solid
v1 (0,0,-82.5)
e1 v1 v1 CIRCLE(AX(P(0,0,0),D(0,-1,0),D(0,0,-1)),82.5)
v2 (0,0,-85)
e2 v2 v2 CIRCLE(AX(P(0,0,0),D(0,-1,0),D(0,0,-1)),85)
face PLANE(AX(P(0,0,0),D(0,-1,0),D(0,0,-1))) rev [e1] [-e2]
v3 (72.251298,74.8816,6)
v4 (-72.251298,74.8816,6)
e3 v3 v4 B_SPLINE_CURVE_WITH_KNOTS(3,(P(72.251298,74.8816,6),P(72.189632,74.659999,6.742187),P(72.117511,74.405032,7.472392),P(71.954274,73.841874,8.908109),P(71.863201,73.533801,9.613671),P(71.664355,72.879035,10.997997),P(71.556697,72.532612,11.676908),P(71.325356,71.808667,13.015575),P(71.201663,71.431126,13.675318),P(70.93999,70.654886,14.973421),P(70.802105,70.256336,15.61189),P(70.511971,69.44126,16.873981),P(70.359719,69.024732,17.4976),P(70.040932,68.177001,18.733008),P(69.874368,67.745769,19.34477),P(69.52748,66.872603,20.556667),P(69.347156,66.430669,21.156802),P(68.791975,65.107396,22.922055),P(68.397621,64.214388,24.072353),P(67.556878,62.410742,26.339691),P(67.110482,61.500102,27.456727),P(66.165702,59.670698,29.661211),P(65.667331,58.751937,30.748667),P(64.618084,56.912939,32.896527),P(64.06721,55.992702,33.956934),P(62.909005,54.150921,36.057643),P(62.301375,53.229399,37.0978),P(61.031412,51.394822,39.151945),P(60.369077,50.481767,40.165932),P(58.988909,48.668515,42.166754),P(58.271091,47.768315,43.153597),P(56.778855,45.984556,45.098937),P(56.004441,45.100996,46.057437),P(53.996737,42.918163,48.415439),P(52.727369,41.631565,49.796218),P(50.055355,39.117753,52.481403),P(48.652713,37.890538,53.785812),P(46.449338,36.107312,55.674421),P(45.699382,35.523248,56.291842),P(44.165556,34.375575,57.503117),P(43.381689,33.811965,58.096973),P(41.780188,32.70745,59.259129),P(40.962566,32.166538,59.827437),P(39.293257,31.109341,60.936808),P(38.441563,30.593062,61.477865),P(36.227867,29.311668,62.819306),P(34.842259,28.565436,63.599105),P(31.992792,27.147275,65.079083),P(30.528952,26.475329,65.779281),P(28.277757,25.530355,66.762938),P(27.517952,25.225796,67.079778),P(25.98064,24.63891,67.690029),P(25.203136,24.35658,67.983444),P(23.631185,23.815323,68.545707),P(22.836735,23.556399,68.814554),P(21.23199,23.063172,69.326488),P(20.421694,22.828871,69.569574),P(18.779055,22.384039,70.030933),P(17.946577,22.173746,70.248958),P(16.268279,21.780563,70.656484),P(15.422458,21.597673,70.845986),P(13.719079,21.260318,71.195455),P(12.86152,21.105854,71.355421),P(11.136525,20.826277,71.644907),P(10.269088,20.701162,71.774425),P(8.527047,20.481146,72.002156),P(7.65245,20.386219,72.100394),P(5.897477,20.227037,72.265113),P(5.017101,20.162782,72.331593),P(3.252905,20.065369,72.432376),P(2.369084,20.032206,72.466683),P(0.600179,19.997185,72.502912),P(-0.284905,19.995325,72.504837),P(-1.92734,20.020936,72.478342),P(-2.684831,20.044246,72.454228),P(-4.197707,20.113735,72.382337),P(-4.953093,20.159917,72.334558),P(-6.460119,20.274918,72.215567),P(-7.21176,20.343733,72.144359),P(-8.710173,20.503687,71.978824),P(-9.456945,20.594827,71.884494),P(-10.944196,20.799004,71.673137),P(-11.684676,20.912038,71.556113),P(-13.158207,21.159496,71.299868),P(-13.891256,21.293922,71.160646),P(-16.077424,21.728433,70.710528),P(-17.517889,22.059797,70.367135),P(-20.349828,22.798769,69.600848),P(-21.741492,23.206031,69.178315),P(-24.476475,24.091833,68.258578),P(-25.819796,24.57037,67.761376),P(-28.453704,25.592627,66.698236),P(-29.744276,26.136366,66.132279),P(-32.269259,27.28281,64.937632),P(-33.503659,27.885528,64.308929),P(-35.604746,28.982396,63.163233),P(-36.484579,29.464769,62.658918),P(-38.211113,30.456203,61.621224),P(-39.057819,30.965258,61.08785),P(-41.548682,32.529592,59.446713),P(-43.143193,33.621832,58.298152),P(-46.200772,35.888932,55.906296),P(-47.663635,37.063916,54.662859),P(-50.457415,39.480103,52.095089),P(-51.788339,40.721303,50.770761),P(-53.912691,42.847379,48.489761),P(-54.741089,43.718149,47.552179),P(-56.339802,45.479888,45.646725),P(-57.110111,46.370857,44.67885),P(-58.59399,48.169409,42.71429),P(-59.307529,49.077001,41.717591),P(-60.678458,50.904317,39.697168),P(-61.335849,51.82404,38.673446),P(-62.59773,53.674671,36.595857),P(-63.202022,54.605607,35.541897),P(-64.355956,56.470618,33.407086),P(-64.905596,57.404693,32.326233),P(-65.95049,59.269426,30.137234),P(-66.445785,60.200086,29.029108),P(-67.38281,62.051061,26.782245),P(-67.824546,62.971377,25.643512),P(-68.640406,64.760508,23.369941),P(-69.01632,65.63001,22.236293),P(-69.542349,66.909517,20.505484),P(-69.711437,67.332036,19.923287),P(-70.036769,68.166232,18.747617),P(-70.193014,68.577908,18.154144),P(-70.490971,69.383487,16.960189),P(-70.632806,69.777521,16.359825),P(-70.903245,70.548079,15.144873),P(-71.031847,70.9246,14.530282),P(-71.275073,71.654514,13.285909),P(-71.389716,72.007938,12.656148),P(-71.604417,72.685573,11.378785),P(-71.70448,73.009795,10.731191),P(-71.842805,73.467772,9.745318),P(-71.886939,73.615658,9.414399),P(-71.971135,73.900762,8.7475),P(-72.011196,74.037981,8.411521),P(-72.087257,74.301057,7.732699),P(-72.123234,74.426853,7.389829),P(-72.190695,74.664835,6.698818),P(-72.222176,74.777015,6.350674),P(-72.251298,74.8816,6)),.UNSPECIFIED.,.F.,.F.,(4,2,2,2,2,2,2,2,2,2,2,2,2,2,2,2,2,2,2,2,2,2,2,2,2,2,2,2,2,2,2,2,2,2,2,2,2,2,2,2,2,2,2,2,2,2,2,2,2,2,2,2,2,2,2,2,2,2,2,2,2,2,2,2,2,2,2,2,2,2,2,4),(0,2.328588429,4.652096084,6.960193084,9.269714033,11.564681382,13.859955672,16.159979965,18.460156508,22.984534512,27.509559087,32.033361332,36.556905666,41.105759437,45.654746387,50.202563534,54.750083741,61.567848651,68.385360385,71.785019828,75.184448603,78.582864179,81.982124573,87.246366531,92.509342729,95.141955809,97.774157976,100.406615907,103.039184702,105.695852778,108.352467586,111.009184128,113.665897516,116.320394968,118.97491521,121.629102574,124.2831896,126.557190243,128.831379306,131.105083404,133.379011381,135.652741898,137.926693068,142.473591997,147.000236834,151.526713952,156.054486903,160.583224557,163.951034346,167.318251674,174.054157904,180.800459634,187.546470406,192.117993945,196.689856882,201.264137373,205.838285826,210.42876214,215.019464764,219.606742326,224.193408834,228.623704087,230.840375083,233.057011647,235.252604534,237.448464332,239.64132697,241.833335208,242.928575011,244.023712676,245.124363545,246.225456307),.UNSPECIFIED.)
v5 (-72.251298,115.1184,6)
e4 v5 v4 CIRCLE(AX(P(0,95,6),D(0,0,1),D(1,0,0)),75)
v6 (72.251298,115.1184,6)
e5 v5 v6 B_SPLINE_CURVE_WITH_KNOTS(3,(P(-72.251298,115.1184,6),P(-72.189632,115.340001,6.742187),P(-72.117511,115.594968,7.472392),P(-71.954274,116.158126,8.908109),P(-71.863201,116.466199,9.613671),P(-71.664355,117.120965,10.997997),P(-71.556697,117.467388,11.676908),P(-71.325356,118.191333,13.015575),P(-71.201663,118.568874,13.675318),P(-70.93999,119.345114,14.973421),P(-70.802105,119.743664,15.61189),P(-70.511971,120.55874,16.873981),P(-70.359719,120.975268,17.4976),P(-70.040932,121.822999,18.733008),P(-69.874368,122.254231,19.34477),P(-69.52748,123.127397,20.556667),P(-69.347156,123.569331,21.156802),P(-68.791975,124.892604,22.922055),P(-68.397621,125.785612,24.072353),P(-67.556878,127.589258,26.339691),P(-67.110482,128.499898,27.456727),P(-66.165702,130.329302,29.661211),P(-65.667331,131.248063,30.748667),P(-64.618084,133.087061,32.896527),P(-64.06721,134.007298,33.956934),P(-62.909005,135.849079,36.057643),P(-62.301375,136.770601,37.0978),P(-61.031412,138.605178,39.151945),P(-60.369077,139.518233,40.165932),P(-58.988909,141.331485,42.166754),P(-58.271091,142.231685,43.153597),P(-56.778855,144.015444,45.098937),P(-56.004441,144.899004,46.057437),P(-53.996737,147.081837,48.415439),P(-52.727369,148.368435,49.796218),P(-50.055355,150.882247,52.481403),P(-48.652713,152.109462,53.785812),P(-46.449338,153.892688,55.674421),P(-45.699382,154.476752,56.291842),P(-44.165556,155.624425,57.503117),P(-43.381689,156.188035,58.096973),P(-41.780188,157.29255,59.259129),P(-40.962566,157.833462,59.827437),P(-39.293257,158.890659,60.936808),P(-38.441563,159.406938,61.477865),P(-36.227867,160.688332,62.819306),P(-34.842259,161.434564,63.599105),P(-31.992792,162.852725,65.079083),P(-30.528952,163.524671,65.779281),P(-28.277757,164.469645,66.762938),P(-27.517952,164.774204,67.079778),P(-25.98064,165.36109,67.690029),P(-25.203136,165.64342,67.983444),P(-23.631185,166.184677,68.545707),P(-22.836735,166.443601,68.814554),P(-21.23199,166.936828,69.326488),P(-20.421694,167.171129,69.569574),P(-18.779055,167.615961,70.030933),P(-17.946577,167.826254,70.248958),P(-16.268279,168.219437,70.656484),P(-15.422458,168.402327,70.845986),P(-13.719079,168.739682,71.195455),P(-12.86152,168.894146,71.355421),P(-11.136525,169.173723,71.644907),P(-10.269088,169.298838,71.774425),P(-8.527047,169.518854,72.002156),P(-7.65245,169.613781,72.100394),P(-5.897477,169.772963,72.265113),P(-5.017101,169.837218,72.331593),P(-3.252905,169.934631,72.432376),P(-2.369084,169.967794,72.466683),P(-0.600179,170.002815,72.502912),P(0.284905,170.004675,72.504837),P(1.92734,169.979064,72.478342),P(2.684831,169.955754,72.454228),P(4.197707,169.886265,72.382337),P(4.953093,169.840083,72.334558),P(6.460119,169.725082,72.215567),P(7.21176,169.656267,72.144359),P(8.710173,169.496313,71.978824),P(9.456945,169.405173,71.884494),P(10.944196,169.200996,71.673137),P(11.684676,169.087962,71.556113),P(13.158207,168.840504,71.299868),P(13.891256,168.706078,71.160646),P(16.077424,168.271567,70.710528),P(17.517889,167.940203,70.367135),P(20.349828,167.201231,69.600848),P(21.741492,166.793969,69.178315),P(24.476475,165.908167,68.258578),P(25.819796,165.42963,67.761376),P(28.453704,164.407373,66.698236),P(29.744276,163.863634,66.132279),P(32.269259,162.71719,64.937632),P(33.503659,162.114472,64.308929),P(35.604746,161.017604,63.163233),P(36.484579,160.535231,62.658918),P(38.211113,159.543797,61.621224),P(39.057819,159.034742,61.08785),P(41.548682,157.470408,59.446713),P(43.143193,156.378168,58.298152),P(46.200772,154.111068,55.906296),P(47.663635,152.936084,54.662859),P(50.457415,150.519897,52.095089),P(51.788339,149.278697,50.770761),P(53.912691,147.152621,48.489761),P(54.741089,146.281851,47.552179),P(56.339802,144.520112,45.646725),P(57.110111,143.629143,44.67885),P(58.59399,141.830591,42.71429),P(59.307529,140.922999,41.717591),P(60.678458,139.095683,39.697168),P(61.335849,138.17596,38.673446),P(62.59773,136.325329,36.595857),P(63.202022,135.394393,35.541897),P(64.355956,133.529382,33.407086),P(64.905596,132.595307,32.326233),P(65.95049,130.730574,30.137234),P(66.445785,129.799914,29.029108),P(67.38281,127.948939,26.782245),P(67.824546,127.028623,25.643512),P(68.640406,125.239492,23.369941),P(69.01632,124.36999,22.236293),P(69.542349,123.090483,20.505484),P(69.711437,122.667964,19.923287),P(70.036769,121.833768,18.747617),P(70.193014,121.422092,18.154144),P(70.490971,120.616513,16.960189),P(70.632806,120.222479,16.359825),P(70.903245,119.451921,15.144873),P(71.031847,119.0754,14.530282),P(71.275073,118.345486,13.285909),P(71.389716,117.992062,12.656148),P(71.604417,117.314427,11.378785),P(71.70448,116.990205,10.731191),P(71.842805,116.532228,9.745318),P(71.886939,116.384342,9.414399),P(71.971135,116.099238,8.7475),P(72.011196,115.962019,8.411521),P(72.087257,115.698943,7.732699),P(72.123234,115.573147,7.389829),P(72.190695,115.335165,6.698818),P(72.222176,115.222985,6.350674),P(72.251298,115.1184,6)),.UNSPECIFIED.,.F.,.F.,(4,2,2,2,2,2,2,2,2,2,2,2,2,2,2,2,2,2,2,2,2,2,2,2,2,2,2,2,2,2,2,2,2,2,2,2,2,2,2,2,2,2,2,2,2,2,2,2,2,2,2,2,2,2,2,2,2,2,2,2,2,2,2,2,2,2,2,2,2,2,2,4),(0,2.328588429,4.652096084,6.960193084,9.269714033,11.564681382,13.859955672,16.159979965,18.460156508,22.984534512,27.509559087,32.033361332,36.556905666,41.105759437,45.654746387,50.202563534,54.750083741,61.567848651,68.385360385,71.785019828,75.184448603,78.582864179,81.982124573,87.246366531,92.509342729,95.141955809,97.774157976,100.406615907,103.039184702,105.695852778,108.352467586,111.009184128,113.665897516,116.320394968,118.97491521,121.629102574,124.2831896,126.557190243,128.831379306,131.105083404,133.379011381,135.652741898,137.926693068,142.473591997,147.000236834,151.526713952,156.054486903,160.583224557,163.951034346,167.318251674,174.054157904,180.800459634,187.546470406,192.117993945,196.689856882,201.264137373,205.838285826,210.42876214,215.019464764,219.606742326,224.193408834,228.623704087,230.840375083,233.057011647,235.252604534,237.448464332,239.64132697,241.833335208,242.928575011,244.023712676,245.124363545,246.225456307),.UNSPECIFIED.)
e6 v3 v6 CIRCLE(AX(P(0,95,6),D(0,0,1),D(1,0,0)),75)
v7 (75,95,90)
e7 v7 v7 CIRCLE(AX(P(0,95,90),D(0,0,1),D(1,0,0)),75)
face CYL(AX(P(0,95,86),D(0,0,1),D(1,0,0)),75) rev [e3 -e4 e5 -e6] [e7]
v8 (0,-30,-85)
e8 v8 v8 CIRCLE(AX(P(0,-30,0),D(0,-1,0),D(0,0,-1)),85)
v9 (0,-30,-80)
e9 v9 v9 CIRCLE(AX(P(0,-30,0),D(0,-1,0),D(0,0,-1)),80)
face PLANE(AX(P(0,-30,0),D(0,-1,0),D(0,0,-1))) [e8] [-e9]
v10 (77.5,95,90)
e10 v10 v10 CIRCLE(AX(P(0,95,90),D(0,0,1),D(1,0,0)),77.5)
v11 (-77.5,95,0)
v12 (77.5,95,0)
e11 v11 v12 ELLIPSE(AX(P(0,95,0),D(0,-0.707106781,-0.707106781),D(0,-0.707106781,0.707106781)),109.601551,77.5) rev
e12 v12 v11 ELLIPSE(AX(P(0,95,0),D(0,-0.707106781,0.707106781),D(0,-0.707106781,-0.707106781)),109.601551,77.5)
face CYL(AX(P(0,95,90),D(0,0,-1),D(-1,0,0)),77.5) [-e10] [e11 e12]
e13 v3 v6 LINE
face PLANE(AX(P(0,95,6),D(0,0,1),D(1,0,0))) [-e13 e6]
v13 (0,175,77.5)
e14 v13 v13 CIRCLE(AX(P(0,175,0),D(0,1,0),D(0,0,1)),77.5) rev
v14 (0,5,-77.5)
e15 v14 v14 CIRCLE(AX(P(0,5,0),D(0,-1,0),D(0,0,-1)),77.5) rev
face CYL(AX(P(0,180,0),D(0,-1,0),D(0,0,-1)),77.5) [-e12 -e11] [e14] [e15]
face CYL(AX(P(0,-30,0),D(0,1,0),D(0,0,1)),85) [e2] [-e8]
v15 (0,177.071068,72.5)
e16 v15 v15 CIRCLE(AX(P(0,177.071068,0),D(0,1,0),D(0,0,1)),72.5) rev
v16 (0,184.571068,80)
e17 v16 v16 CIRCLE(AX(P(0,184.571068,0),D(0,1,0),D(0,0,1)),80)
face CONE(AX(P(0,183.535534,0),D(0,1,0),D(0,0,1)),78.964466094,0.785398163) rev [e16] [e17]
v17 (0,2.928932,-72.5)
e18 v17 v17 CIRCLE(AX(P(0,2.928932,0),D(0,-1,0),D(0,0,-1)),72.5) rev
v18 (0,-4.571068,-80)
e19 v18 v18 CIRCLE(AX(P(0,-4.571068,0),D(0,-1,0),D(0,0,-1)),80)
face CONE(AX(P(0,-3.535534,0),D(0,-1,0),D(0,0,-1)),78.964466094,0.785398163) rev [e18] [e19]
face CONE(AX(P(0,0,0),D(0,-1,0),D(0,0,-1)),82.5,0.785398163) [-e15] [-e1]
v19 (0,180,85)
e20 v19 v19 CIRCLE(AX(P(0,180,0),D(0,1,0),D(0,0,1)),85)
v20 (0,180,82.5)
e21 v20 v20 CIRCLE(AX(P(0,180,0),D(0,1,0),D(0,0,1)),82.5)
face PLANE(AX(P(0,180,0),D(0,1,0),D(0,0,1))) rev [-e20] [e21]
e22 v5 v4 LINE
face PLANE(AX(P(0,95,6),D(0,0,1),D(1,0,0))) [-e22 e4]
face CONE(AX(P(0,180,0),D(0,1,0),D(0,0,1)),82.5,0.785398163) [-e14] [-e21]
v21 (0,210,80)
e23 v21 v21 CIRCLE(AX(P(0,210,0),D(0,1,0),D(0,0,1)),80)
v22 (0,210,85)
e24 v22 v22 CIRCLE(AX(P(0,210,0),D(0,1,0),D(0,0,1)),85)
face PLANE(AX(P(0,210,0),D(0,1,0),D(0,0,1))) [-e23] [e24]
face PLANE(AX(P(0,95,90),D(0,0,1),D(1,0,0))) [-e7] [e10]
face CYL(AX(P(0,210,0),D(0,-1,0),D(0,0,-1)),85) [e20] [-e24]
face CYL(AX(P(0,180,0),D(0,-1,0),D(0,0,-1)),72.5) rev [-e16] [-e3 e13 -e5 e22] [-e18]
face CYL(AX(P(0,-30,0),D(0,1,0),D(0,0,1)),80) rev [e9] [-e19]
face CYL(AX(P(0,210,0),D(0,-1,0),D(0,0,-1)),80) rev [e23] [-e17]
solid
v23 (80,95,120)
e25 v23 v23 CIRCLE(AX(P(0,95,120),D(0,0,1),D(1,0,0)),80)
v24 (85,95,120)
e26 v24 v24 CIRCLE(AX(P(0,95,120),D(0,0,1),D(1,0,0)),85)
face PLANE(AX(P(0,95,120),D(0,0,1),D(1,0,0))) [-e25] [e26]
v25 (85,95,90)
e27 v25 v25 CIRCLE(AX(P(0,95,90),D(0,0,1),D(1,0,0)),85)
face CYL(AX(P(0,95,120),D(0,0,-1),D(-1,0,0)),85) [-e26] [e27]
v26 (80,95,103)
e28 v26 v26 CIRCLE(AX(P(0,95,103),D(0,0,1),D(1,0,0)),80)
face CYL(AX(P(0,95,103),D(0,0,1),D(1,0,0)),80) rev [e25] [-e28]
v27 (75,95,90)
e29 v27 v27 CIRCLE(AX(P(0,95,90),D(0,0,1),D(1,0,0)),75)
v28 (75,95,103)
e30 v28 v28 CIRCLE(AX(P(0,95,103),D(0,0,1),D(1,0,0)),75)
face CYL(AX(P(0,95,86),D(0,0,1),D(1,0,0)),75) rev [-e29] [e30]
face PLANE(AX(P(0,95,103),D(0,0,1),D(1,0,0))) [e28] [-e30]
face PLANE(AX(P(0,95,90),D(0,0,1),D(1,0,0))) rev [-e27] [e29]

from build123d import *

# Parameters (mm, degrees)
SKETCH1_R            = 77.5
BOSS_EXTRUDE1_DEPTH  = 180
SKETCH2_R            = 77.5
BOSS_EXTRUDE2_DEPTH  = 90
SKETCH5_R            = 85
BOSS_EXTRUDE3_DEPTH  = 30
BOSS_EXTRUDE4_START  = 30
SKETCH6_R            = 85
BOSS_EXTRUDE4_DEPTH  = 30
SKETCH8_R            = 85
BOSS_EXTRUDE12_DEPTH = 30
SKETCH9_R            = 80
CUT_EXTRUDE1_DEPTH   = 17
SKETCH10_R           = 75
CUT_EXTRUDE2_DEPTH   = 17
CHAMFER1_SIZE        = 5
SKETCH16_R           = 75
CUT_EXTRUDE3_DEPTH   = 80


# Read off the part's stored shape, not the designer's step: Shell1
with BuildPart() as part:
    # Sketch1 → Boss-Extrude1 (new body)
    with BuildSketch(Plane(origin=(0, 0, 0), x_dir=(1, 0, 0), z_dir=(0, 1, 0))):
        with Locations(Location((0, 0, 0), (0, 0, 90))):
            Circle(SKETCH1_R)
    extrude(amount=BOSS_EXTRUDE1_DEPTH)

    # Sketch2 → Boss-Extrude2 (add)
    with BuildSketch(Plane.XY):
        with Locations((0, 95)):
            Circle(SKETCH2_R)
    extrude(amount=BOSS_EXTRUDE2_DEPTH)

    # Sketch5 → Boss-Extrude3 (add)
    with BuildSketch(Plane.XZ):
        with Locations(Location((0, 0, 0), (0, 0, 270))):
            Circle(SKETCH5_R)
    extrude(amount=BOSS_EXTRUDE3_DEPTH)

    # Sketch6 → Boss-Extrude4 (add)
    with BuildSketch(Plane(origin=(0, 180, 0), x_dir=(1, 0, 0), z_dir=(0, 1, 0)).offset(BOSS_EXTRUDE4_START)):
        with Locations(Location((0, 0, 0), (0, 0, 90))):
            Circle(SKETCH6_R)
    extrude(amount=-BOSS_EXTRUDE4_DEPTH)


with BuildPart() as body_2:
    # Sketch8 → Boss-Extrude12 (new body)
    with BuildSketch(Plane.XY.offset(90)):
        with Locations((0, 95)):
            Circle(SKETCH8_R)
    extrude(amount=BOSS_EXTRUDE12_DEPTH)

    # Sketch9 → Cut-Extrude1 (cut)
    with BuildSketch(Plane.XY.offset(120)):
        with Locations((0, 95)):
            Circle(SKETCH9_R)
    extrude(amount=-CUT_EXTRUDE1_DEPTH, mode=Mode.SUBTRACT)


with BuildPart() as cut_extrude2_tool:
    # Sketch10 → Cut-Extrude2 (new body)
    with BuildSketch(Plane.XY.offset(103)):
        with Locations((0, 95)):
            Circle(SKETCH10_R)
    extrude(amount=-CUT_EXTRUDE2_DEPTH)


with BuildPart() as part_1:
    add(part.part)

    # Cut-Extrude2: cut by cut_extrude2_tool
    add(cut_extrude2_tool.part, mode=Mode.SUBTRACT)

    # Chamfer1
    chamfer1_edges = [part_1.edges().sort_by_distance(p)[0] for p in [
        (0, 0, 77.5),
        (0, 180, 77.5),
    ]]
    chamfer(chamfer1_edges, length=CHAMFER1_SIZE)

    # Shell1 outline → Shell1 (revolve, cut)
    with BuildSketch(Plane.XY):
        Polygon((80, 210), (0, 210), (0, -30), (80, -30), (80, -4.571067812), (72.5, 2.928932188), (72.5, 177.071067812), (80, 184.571067812), align=None)
    revolve(axis=Axis((0, 0, 0), (0, 1, 0)), mode=Mode.SUBTRACT)

    # Sketch16 → Cut-Extrude3 (cut)
    with BuildSketch(Plane.XY.offset(86)):
        with Locations((0, 95)):
            Circle(SKETCH16_R)
    extrude(amount=-CUT_EXTRUDE3_DEPTH, mode=Mode.SUBTRACT)


with BuildPart() as body_2_1:
    add(body_2.part)

    # Cut-Extrude2: cut by cut_extrude2_tool
    add(cut_extrude2_tool.part, mode=Mode.SUBTRACT)


solid = Compound([part_1.part, body_2_1.part])
